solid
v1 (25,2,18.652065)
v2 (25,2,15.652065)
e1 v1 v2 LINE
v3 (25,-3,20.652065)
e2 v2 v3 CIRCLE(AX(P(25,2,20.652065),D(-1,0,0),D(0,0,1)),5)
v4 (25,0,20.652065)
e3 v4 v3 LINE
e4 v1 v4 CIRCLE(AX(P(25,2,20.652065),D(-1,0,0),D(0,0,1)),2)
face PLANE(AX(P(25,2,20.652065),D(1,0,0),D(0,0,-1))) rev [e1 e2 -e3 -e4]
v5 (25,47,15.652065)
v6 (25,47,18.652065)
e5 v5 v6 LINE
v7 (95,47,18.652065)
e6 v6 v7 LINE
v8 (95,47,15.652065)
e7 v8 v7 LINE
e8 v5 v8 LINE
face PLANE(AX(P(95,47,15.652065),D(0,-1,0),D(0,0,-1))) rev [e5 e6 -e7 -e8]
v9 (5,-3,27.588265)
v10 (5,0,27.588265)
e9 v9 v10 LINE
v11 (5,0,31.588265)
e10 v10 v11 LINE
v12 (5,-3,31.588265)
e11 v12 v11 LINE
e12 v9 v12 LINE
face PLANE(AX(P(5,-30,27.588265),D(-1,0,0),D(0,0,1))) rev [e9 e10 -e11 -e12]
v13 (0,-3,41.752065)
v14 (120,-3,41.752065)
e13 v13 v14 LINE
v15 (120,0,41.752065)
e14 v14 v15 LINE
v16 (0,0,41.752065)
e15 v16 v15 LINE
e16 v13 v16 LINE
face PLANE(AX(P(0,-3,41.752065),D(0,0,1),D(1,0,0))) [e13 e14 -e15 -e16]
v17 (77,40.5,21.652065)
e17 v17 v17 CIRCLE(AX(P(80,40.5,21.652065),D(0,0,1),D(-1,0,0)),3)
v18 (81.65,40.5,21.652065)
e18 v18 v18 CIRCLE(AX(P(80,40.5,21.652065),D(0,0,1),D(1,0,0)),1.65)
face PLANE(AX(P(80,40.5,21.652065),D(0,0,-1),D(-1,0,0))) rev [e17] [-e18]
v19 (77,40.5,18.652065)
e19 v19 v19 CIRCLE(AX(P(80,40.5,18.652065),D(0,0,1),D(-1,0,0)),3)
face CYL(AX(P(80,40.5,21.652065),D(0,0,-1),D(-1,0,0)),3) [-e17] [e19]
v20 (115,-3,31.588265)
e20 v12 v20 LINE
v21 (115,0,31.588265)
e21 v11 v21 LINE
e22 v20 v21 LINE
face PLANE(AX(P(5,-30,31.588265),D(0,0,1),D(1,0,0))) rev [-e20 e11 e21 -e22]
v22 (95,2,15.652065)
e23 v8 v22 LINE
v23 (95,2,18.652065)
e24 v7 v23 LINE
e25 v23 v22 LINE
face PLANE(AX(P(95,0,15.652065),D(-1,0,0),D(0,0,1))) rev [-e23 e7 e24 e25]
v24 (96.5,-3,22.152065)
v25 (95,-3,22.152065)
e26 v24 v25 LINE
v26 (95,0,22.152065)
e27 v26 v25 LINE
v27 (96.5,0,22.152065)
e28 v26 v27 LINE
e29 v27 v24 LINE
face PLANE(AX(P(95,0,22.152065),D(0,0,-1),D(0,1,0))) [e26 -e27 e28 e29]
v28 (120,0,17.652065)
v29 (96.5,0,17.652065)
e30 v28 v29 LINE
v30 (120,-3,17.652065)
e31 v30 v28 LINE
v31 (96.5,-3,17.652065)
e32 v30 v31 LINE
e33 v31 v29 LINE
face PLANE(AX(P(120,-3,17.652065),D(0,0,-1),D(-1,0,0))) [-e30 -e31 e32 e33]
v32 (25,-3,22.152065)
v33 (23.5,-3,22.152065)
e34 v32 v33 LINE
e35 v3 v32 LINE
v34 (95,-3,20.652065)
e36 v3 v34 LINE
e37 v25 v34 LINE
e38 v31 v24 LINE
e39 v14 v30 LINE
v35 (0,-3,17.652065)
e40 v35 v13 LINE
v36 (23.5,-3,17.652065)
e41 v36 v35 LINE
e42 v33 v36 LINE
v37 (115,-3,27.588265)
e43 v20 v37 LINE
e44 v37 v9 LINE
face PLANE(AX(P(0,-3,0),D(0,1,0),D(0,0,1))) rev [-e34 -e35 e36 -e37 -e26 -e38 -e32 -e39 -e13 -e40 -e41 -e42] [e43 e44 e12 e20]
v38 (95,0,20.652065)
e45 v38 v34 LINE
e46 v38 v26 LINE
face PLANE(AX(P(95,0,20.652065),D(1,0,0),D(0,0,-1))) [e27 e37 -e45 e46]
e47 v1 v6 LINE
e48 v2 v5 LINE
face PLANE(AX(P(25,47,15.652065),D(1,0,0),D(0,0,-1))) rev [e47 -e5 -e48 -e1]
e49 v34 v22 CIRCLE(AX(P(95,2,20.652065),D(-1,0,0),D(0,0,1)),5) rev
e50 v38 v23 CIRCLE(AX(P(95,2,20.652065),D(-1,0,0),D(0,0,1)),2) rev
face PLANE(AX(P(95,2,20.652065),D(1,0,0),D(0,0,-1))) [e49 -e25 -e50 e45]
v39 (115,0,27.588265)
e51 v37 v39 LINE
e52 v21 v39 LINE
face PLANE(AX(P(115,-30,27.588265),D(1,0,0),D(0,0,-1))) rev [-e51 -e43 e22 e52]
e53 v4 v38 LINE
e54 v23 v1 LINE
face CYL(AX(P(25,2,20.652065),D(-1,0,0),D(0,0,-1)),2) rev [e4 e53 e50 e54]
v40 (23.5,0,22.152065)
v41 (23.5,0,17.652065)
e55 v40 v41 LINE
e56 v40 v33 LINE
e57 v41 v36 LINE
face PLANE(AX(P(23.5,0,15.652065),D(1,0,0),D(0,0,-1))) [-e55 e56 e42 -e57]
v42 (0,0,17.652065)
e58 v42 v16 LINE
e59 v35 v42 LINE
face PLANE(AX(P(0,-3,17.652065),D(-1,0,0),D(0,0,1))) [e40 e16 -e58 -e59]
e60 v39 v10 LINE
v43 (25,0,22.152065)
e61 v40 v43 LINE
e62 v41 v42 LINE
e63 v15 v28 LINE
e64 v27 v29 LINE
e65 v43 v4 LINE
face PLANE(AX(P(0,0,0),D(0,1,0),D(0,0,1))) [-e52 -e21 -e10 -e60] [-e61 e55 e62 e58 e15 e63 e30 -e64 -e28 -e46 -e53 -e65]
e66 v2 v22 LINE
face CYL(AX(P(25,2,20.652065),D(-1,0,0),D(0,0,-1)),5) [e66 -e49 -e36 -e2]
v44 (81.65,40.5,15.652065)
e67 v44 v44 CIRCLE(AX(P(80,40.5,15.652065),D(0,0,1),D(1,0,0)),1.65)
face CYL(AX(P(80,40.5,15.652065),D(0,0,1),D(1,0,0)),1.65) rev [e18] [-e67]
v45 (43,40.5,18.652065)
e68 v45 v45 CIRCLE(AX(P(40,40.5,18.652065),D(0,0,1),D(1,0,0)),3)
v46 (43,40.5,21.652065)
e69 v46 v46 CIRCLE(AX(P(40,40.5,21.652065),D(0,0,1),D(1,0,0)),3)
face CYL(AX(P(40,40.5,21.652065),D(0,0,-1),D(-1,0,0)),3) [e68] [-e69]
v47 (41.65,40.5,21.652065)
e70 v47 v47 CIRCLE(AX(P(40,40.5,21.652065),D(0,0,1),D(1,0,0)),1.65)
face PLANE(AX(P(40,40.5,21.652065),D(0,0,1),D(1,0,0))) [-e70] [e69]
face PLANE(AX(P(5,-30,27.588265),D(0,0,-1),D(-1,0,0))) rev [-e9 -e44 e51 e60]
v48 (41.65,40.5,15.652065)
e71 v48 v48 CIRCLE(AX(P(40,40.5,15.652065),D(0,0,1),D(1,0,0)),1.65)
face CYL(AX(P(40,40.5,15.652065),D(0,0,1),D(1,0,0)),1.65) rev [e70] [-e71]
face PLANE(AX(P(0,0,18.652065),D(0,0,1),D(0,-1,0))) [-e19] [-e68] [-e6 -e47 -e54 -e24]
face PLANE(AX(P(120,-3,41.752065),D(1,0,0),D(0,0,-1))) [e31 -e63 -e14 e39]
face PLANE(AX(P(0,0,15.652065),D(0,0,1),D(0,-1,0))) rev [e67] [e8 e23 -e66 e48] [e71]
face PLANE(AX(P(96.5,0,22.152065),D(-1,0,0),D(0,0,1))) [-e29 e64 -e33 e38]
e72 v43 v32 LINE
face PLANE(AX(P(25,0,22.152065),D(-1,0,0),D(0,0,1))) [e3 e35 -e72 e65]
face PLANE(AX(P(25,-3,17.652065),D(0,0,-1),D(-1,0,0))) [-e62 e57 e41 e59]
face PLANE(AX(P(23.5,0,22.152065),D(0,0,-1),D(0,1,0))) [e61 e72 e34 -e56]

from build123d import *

# Parameters (mm, degrees)
SM_BASE_FLANGE_2_DEPTH            = 3
SM_EDGE_FLANGE_2_STRIP_W          = 16
SM_EDGE_FLANGE_2_STRIP_H          = 3
SM_EDGE_FLANGE_2_STRIP_CUT_DEPTH  = 70
SM_EDGE_FLANGE_2_RELIEF_W         = 17.5
SM_EDGE_FLANGE_2_RELIEF_H         = 1.5
SM_EDGE_FLANGE_2_RELIEF_CUT_DEPTH = 3
SM_EDGE_FLANGE_2_DEPTH            = 70
SKETCH_21_W                       = 110
SKETCH_21_H                       = 4
CUT_EXTRUDE_1_DEPTH               = 30
SKETCH_23_R                       = 3
EXTRUDE_1_DEPTH                   = 3
SKETCH_24_R                       = 1.65
CUT_EXTRUDE_2_DEPTH               = 6


# Sheet-metal steps are written as plain solids
with BuildPart() as part:
    # 草图15 → 基体-法兰2 (new body)
    with BuildSketch(Plane(origin=(0, 0, 0), x_dir=(1, 0, 0), z_dir=(0, 1, 0))):
        Polygon((0, -41.752065), (120, -41.752065), (120, -17.652065), (95, -17.652065), (95, -15.652065), (25, -15.652065), (25, -17.652065), (0, -17.652065), align=None)
    extrude(amount=-SM_BASE_FLANGE_2_DEPTH)

    # 边线-法兰2 strip (across the edge) → 边线-法兰2 strip cut (cut)
    with BuildSketch(Plane(origin=(95, 0, 15.652065), x_dir=(0, 0, 1), z_dir=(-1, 0, 0))):
        with Locations((-3, -1.5)):
            Rectangle(SM_EDGE_FLANGE_2_STRIP_W, SM_EDGE_FLANGE_2_STRIP_H)
    extrude(amount=SM_EDGE_FLANGE_2_STRIP_CUT_DEPTH, mode=Mode.SUBTRACT)

    # 边线-法兰2 relief (on the sheet) → 边线-法兰2 relief cut (cut)
    with BuildSketch(Plane(origin=(95, 0, 20.652065), x_dir=(0, 0, 1), z_dir=(0, 1, 0))):
        with Locations((-7.25, 0.75)):
            Rectangle(SM_EDGE_FLANGE_2_RELIEF_W, SM_EDGE_FLANGE_2_RELIEF_H)
        with Locations((-7.25, -70.75)):
            Rectangle(SM_EDGE_FLANGE_2_RELIEF_W, SM_EDGE_FLANGE_2_RELIEF_H)
    extrude(amount=-SM_EDGE_FLANGE_2_RELIEF_CUT_DEPTH, mode=Mode.SUBTRACT)

    # 边线-法兰2 section (across the edge) → 边线-法兰2 (add)
    with BuildSketch(Plane(origin=(95, 0, 15.652065), x_dir=(0, 0, 1), z_dir=(-1, 0, 0))):
        with BuildLine():
            Line((0, 2), (0, 47))
            Line((0, 47), (3, 47))
            Line((3, 47), (3, 2))
            ThreePointArc((3, 2), (3.585786438, 0.585786438), (5, 0))
            Line((5, 0), (5, -3))
            ThreePointArc((5, -3), (1.464466094, -1.535533906), (0, 2))
        make_face()
    extrude(amount=SM_EDGE_FLANGE_2_DEPTH)

    # 草图21 → 切除-拉伸1 (cut)
    with BuildSketch(Plane(origin=(0, 0, 0), x_dir=(1, 0, 0), z_dir=(0, 1, 0))):
        with Locations((60, -29.58826484)):
            Rectangle(SKETCH_21_W, SKETCH_21_H)
    extrude(amount=-CUT_EXTRUDE_1_DEPTH, mode=Mode.SUBTRACT)

    # 草图23 → 凸台-拉伸1 (add)
    with BuildSketch(Plane.XY.offset(18.652065)):
        with Locations((40, 40.5)):
            Circle(SKETCH_23_R)
        with Locations(Location((80, 40.5, 0), (0, 0, 180))):
            Circle(SKETCH_23_R)
    extrude(amount=EXTRUDE_1_DEPTH)

    # 草图24 → 切除-拉伸2 (cut)
    with BuildSketch(Plane.XY.offset(21.652065)):
        with Locations((40, 40.5)):
            Circle(SKETCH_24_R)
        with Locations((80, 40.5)):
            Circle(SKETCH_24_R)
    extrude(amount=-CUT_EXTRUDE_2_DEPTH, mode=Mode.SUBTRACT)


solid = part.part
